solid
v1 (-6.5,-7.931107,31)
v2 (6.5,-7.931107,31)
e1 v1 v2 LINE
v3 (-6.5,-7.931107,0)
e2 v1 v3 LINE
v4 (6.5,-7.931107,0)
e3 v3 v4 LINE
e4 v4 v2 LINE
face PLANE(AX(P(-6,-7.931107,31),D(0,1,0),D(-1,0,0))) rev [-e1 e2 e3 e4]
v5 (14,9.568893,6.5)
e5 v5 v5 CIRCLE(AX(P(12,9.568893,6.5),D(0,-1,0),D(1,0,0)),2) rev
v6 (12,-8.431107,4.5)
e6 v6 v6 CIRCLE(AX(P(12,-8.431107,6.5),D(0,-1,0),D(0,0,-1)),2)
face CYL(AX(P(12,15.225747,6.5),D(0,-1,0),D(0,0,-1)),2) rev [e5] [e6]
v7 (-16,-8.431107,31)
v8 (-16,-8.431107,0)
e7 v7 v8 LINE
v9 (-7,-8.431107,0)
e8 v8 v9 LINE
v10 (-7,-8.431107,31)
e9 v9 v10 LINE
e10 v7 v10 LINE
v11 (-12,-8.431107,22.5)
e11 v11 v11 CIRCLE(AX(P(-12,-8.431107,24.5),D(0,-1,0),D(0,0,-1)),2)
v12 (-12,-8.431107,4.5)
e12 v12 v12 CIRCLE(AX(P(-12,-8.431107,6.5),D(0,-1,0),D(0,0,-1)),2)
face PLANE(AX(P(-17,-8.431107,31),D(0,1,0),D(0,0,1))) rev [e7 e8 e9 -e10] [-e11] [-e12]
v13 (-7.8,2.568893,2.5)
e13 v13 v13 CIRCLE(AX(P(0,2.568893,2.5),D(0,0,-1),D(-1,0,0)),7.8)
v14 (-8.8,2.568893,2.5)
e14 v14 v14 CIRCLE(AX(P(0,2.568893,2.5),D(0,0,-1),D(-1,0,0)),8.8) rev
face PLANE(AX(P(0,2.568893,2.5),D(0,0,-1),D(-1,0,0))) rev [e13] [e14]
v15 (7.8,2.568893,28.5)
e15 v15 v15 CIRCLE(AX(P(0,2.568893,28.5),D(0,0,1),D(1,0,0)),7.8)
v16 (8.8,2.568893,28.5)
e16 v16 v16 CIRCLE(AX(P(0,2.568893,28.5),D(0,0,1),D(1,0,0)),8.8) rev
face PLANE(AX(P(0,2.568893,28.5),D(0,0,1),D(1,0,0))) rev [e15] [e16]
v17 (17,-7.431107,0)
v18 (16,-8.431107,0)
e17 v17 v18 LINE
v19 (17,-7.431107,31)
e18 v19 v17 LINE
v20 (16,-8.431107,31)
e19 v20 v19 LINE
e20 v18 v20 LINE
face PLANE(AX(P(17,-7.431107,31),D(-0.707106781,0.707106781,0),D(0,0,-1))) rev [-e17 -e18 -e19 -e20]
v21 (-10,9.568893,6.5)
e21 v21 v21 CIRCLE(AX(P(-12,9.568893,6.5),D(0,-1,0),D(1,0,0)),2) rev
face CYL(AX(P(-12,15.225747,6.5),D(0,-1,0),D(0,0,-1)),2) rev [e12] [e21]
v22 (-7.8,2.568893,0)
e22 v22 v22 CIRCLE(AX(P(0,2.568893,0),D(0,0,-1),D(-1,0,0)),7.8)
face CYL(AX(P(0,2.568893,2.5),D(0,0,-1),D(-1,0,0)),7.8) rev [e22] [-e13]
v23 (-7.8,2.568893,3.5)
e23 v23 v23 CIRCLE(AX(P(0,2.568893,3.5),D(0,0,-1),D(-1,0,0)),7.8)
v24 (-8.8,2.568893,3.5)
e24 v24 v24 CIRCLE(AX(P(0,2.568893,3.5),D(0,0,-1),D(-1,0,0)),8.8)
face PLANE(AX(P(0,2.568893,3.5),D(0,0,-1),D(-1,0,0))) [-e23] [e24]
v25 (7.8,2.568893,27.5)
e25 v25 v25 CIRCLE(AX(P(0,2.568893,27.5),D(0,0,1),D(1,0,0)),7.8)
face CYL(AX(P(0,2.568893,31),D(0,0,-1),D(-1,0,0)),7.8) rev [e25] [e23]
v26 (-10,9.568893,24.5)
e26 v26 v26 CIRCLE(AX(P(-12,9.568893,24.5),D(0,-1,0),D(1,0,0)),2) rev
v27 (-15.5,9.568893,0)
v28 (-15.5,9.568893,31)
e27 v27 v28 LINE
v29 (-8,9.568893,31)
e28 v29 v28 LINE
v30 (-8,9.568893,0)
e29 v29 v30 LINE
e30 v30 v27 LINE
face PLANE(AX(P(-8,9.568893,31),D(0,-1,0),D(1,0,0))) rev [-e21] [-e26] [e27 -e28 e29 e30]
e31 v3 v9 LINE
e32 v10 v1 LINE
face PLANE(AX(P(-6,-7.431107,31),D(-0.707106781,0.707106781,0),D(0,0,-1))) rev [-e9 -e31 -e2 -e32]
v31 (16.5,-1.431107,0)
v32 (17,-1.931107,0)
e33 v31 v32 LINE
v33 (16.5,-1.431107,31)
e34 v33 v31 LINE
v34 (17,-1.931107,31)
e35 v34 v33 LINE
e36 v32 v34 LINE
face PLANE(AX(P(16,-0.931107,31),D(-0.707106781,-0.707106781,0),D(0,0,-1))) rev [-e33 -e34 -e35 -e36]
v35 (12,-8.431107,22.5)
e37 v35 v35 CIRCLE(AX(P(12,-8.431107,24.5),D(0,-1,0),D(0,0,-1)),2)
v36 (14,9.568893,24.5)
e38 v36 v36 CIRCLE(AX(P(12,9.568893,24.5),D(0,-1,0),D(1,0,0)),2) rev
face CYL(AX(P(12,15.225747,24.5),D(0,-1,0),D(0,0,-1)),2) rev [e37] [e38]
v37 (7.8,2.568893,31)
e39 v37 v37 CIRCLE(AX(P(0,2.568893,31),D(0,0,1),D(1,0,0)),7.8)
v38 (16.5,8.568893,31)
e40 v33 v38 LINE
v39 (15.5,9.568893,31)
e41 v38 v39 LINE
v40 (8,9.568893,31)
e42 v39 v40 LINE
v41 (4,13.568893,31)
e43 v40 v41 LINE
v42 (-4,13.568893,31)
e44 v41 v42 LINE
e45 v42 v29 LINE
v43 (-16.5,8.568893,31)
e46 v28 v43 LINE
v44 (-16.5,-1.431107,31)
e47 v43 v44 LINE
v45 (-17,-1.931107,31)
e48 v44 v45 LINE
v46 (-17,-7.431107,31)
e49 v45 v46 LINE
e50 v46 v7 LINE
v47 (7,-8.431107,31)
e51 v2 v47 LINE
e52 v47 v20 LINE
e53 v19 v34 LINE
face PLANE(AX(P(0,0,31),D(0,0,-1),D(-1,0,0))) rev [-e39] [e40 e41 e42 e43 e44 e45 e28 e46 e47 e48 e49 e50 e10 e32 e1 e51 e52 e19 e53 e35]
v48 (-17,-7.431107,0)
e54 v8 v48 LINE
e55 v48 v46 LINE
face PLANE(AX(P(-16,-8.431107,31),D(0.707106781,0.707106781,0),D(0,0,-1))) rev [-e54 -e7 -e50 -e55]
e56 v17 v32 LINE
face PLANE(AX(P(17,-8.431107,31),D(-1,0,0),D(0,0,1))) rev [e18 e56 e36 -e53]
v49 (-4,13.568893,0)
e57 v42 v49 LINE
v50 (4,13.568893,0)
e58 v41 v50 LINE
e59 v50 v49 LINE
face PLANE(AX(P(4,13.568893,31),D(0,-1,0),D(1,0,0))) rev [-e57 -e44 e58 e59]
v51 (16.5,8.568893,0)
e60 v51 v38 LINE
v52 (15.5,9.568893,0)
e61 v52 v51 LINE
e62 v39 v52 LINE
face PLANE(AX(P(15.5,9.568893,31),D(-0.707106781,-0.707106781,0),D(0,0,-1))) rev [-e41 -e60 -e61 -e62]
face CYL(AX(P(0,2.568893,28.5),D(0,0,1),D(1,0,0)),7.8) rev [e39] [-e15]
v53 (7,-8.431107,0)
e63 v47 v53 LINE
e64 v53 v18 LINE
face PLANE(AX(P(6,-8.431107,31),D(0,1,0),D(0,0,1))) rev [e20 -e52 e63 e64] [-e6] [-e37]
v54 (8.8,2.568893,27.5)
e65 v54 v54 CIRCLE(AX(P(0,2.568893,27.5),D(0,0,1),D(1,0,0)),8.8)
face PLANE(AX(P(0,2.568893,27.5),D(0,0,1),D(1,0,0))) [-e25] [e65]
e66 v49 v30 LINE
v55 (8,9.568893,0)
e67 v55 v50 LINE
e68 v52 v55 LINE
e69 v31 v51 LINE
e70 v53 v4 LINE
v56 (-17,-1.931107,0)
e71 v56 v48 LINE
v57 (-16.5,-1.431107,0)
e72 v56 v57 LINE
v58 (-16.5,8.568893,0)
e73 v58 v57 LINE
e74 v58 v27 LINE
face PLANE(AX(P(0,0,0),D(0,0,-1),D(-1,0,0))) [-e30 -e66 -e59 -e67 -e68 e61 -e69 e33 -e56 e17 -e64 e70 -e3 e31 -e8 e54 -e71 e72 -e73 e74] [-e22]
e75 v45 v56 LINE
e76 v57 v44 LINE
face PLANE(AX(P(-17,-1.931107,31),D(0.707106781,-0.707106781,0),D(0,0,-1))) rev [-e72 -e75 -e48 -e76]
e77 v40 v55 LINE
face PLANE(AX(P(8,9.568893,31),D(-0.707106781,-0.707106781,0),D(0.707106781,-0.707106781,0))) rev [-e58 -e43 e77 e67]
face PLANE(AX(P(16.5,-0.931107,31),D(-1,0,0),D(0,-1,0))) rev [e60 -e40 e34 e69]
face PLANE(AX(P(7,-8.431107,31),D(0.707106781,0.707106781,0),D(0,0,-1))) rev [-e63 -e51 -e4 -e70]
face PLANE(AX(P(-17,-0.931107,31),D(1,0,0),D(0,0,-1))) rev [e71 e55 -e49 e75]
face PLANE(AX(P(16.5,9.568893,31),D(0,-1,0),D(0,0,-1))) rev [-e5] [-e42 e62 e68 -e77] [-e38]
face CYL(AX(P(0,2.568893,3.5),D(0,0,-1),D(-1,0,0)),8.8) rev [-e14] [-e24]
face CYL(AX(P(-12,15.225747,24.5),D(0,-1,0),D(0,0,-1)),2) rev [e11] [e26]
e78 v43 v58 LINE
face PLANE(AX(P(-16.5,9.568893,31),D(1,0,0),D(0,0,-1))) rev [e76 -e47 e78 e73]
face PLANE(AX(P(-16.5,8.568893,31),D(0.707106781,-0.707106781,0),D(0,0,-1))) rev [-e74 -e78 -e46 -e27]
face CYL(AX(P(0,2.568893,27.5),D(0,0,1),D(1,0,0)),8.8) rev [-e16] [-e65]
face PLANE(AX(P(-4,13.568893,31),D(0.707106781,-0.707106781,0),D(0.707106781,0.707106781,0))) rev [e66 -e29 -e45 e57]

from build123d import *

# Parameters (mm, degrees)
SKETCH1_R           = 7.8
BOSS_EXTRUDE1_DEPTH = 31
CHAMFER1_SIZE       = 1
CHAMFER2_SIZE       = 1
CHAMFER3_SIZE       = 1
CHAMFER4_SIZE       = 1
SKETCH2_R           = 2
CUT_EXTRUDE1_DEPTH  = 18
SKETCH3_R           = 8.8
CUT_EXTRUDE2_DEPTH  = 3.5
CUT_EXTRUDE3_START  = -3.5
SKETCH4_R           = 8.8
CUT_EXTRUDE3_DEPTH  = 3.5
BOSS_EXTRUDE2_START = -2.5
SKETCH5_R           = 8.8
SKETCH5_R_2         = 7.8
BOSS_EXTRUDE2_DEPTH = 2.5
SKETCH6_R           = 8.8
SKETCH6_R_2         = 7.8
BOSS_EXTRUDE3_DEPTH = 2.5


with BuildPart() as part:
    # Sketch1 → Boss-Extrude1 (new body)
    with BuildSketch(Plane.XY):
        Polygon((-6, -7.931107296), (6, -7.931107296), (6, -8.431107296), (17, -8.431107296), (17, -0.931107296), (16.5, -0.931107296), (16.5, 9.568892704), (8, 9.568892704), (4, 13.568892704), (-4, 13.568892704), (-8, 9.568892704), (-16.5, 9.568892704), (-16.5, -0.931107296), (-17, -0.931107296), (-17, -8.431107296), (-6, -8.431107296), align=None)
        with Locations((0, 2.568892704)):
            Circle(SKETCH1_R, mode=Mode.SUBTRACT)
    extrude(amount=BOSS_EXTRUDE1_DEPTH)

    # Chamfer1
    chamfer1_edges = [part.edges().sort_by_distance(p)[0] for p in [
        (-16.5, 9.568892704, 15.5),
        (16.5, 9.568892704, 15.5),
    ]]
    chamfer(chamfer1_edges, length=CHAMFER1_SIZE)

    # Chamfer2
    # the kernel refuses this chamfer: 1 mm, written as the material it takes off along each edge
    with BuildSketch(Plane(origin=(-17, -0.931107296, -2.571682988), x_dir=(-0.02749587661058563, -0.9996219169112968, 0), z_dir=(0, 0, 1))) as chamfer2_piece_1_section:
        Polygon((CHAMFER2_SIZE * 0.999621916911, CHAMFER2_SIZE * 0.0274958766106), (-CHAMFER2_SIZE * 0.0274958766106, CHAMFER2_SIZE * 0.999621916911), (0, 0), align=None)
    chamfer2_piece_1 = extrude(amount=36.143365976, mode=Mode.PRIVATE)
    chamfer2_piece_1 = split(chamfer2_piece_1, bisect_by=Plane(origin=(-16.5, -1.32450838, 15.5), z_dir=(-1, 0, 0)), keep=Keep.TOP, mode=Mode.PRIVATE)
    add(chamfer2_piece_1, mode=Mode.SUBTRACT)
    with BuildSketch(Plane(origin=(17, -0.931107296, -2.571682988), x_dir=(-0.9996219169112968, 0.027495876610586403, 0), z_dir=(0, 0, 1))) as chamfer2_piece_2_section:
        Polygon((CHAMFER2_SIZE * 0.999621916911, CHAMFER2_SIZE * 0.0274958766106), (-CHAMFER2_SIZE * 0.0274958766106, CHAMFER2_SIZE * 0.999621916911), (0, 0), align=None)
    chamfer2_piece_2 = extrude(amount=36.143365976, mode=Mode.PRIVATE)
    chamfer2_piece_2 = split(chamfer2_piece_2, bisect_by=Plane(origin=(16.5, -1.32450838, 15.5), z_dir=(1, 0, 0)), keep=Keep.TOP, mode=Mode.PRIVATE)
    add(chamfer2_piece_2, mode=Mode.SUBTRACT)

    # Chamfer3
    chamfer3_edges = [part.edges().sort_by_distance(p)[0] for p in [
        (-17, -8.431107296, 15.5),
        (17, -8.431107296, 15.5),
    ]]
    chamfer(chamfer3_edges, length=CHAMFER3_SIZE)

    # Chamfer4
    # the kernel refuses this chamfer: 1 mm, written as the material it takes off along each edge
    with BuildSketch(Plane(origin=(-6, -8.431107296, -2.571682988), x_dir=(-0.9996219169112968, -0.027495876610585623, 0), z_dir=(0, 0, 1))) as chamfer4_piece_1_section:
        Polygon((CHAMFER4_SIZE * 0.999621916911, -CHAMFER4_SIZE * 0.0274958766106), (-CHAMFER4_SIZE * 0.0274958766106, -CHAMFER4_SIZE * 0.999621916911), (0, 0), align=None)
    chamfer4_piece_1 = extrude(amount=36.143365976, mode=Mode.PRIVATE)
    chamfer4_piece_1 = split(chamfer4_piece_1, bisect_by=Plane(origin=(-6.393401084, -7.931107296, 15.5), z_dir=(0, -1, 0)), keep=Keep.TOP, mode=Mode.PRIVATE)
    add(chamfer4_piece_1, mode=Mode.SUBTRACT)
    with BuildSketch(Plane(origin=(6, -8.431107296, -2.571682988), x_dir=(-0.027495876610586487, 0.9996219169112968, 0), z_dir=(0, 0, 1))) as chamfer4_piece_2_section:
        Polygon((CHAMFER4_SIZE * 0.999621916911, -CHAMFER4_SIZE * 0.0274958766106), (-CHAMFER4_SIZE * 0.0274958766106, -CHAMFER4_SIZE * 0.999621916911), (0, 0), align=None)
    chamfer4_piece_2 = extrude(amount=36.143365976, mode=Mode.PRIVATE)
    chamfer4_piece_2 = split(chamfer4_piece_2, bisect_by=Plane(origin=(6.393401084, -7.931107296, 15.5), z_dir=(0, -1, 0)), keep=Keep.TOP, mode=Mode.PRIVATE)
    add(chamfer4_piece_2, mode=Mode.SUBTRACT)

    # Sketch2 → Cut-Extrude1 (cut)
    with BuildSketch(Plane.XZ.offset(8.431107296)):
        with Locations(Location((-12, 6.5, 0), (0, 0, 270))):
            Circle(SKETCH2_R)
        with Locations(Location((-12, 24.5, 0), (0, 0, 270))):
            Circle(SKETCH2_R)
        with Locations(Location((12, 6.5, 0), (0, 0, 270))):
            Circle(SKETCH2_R)
        with Locations(Location((12, 24.5, 0), (0, 0, 270))):
            Circle(SKETCH2_R)
    extrude(amount=-CUT_EXTRUDE1_DEPTH, mode=Mode.SUBTRACT)

    # Sketch3 → Cut-Extrude2 (cut)
    with BuildSketch(Plane.XY.offset(31)):
        with Locations((0, 2.568892704)):
            Circle(SKETCH3_R)
    extrude(amount=-CUT_EXTRUDE2_DEPTH, mode=Mode.SUBTRACT)

    # Sketch4 → Cut-Extrude3 (cut)
    with BuildSketch(Plane(origin=(0, 0, 0), x_dir=(-1, 0, 0), z_dir=(0, 0, -1)).offset(CUT_EXTRUDE3_START)):
        with Locations(Location((0, 2.568892704, 0), (0, 0, 180))):
            Circle(SKETCH4_R)
    extrude(amount=CUT_EXTRUDE3_DEPTH, mode=Mode.SUBTRACT)

    # Sketch5 → Boss-Extrude2 (add)
    with BuildSketch(Plane(origin=(0, 0, 0), x_dir=(-1, 0, 0), z_dir=(0, 0, -1)).offset(BOSS_EXTRUDE2_START)):
        with Locations((0, 2.568892704)):
            Circle(SKETCH5_R)
        with Locations((0, 2.568892704)):
            Circle(SKETCH5_R_2, mode=Mode.SUBTRACT)
    extrude(amount=BOSS_EXTRUDE2_DEPTH)

    # Sketch6 → Boss-Extrude3 (add)
    with BuildSketch(Plane.XY.offset(31)):
        with Locations((0, 2.568892704)):
            Circle(SKETCH6_R)
        with Locations(Location((0, 2.568892704, 0), (0, 0, 180))):
            Circle(SKETCH6_R_2, mode=Mode.SUBTRACT)
    extrude(amount=-BOSS_EXTRUDE3_DEPTH)


solid = part.part
